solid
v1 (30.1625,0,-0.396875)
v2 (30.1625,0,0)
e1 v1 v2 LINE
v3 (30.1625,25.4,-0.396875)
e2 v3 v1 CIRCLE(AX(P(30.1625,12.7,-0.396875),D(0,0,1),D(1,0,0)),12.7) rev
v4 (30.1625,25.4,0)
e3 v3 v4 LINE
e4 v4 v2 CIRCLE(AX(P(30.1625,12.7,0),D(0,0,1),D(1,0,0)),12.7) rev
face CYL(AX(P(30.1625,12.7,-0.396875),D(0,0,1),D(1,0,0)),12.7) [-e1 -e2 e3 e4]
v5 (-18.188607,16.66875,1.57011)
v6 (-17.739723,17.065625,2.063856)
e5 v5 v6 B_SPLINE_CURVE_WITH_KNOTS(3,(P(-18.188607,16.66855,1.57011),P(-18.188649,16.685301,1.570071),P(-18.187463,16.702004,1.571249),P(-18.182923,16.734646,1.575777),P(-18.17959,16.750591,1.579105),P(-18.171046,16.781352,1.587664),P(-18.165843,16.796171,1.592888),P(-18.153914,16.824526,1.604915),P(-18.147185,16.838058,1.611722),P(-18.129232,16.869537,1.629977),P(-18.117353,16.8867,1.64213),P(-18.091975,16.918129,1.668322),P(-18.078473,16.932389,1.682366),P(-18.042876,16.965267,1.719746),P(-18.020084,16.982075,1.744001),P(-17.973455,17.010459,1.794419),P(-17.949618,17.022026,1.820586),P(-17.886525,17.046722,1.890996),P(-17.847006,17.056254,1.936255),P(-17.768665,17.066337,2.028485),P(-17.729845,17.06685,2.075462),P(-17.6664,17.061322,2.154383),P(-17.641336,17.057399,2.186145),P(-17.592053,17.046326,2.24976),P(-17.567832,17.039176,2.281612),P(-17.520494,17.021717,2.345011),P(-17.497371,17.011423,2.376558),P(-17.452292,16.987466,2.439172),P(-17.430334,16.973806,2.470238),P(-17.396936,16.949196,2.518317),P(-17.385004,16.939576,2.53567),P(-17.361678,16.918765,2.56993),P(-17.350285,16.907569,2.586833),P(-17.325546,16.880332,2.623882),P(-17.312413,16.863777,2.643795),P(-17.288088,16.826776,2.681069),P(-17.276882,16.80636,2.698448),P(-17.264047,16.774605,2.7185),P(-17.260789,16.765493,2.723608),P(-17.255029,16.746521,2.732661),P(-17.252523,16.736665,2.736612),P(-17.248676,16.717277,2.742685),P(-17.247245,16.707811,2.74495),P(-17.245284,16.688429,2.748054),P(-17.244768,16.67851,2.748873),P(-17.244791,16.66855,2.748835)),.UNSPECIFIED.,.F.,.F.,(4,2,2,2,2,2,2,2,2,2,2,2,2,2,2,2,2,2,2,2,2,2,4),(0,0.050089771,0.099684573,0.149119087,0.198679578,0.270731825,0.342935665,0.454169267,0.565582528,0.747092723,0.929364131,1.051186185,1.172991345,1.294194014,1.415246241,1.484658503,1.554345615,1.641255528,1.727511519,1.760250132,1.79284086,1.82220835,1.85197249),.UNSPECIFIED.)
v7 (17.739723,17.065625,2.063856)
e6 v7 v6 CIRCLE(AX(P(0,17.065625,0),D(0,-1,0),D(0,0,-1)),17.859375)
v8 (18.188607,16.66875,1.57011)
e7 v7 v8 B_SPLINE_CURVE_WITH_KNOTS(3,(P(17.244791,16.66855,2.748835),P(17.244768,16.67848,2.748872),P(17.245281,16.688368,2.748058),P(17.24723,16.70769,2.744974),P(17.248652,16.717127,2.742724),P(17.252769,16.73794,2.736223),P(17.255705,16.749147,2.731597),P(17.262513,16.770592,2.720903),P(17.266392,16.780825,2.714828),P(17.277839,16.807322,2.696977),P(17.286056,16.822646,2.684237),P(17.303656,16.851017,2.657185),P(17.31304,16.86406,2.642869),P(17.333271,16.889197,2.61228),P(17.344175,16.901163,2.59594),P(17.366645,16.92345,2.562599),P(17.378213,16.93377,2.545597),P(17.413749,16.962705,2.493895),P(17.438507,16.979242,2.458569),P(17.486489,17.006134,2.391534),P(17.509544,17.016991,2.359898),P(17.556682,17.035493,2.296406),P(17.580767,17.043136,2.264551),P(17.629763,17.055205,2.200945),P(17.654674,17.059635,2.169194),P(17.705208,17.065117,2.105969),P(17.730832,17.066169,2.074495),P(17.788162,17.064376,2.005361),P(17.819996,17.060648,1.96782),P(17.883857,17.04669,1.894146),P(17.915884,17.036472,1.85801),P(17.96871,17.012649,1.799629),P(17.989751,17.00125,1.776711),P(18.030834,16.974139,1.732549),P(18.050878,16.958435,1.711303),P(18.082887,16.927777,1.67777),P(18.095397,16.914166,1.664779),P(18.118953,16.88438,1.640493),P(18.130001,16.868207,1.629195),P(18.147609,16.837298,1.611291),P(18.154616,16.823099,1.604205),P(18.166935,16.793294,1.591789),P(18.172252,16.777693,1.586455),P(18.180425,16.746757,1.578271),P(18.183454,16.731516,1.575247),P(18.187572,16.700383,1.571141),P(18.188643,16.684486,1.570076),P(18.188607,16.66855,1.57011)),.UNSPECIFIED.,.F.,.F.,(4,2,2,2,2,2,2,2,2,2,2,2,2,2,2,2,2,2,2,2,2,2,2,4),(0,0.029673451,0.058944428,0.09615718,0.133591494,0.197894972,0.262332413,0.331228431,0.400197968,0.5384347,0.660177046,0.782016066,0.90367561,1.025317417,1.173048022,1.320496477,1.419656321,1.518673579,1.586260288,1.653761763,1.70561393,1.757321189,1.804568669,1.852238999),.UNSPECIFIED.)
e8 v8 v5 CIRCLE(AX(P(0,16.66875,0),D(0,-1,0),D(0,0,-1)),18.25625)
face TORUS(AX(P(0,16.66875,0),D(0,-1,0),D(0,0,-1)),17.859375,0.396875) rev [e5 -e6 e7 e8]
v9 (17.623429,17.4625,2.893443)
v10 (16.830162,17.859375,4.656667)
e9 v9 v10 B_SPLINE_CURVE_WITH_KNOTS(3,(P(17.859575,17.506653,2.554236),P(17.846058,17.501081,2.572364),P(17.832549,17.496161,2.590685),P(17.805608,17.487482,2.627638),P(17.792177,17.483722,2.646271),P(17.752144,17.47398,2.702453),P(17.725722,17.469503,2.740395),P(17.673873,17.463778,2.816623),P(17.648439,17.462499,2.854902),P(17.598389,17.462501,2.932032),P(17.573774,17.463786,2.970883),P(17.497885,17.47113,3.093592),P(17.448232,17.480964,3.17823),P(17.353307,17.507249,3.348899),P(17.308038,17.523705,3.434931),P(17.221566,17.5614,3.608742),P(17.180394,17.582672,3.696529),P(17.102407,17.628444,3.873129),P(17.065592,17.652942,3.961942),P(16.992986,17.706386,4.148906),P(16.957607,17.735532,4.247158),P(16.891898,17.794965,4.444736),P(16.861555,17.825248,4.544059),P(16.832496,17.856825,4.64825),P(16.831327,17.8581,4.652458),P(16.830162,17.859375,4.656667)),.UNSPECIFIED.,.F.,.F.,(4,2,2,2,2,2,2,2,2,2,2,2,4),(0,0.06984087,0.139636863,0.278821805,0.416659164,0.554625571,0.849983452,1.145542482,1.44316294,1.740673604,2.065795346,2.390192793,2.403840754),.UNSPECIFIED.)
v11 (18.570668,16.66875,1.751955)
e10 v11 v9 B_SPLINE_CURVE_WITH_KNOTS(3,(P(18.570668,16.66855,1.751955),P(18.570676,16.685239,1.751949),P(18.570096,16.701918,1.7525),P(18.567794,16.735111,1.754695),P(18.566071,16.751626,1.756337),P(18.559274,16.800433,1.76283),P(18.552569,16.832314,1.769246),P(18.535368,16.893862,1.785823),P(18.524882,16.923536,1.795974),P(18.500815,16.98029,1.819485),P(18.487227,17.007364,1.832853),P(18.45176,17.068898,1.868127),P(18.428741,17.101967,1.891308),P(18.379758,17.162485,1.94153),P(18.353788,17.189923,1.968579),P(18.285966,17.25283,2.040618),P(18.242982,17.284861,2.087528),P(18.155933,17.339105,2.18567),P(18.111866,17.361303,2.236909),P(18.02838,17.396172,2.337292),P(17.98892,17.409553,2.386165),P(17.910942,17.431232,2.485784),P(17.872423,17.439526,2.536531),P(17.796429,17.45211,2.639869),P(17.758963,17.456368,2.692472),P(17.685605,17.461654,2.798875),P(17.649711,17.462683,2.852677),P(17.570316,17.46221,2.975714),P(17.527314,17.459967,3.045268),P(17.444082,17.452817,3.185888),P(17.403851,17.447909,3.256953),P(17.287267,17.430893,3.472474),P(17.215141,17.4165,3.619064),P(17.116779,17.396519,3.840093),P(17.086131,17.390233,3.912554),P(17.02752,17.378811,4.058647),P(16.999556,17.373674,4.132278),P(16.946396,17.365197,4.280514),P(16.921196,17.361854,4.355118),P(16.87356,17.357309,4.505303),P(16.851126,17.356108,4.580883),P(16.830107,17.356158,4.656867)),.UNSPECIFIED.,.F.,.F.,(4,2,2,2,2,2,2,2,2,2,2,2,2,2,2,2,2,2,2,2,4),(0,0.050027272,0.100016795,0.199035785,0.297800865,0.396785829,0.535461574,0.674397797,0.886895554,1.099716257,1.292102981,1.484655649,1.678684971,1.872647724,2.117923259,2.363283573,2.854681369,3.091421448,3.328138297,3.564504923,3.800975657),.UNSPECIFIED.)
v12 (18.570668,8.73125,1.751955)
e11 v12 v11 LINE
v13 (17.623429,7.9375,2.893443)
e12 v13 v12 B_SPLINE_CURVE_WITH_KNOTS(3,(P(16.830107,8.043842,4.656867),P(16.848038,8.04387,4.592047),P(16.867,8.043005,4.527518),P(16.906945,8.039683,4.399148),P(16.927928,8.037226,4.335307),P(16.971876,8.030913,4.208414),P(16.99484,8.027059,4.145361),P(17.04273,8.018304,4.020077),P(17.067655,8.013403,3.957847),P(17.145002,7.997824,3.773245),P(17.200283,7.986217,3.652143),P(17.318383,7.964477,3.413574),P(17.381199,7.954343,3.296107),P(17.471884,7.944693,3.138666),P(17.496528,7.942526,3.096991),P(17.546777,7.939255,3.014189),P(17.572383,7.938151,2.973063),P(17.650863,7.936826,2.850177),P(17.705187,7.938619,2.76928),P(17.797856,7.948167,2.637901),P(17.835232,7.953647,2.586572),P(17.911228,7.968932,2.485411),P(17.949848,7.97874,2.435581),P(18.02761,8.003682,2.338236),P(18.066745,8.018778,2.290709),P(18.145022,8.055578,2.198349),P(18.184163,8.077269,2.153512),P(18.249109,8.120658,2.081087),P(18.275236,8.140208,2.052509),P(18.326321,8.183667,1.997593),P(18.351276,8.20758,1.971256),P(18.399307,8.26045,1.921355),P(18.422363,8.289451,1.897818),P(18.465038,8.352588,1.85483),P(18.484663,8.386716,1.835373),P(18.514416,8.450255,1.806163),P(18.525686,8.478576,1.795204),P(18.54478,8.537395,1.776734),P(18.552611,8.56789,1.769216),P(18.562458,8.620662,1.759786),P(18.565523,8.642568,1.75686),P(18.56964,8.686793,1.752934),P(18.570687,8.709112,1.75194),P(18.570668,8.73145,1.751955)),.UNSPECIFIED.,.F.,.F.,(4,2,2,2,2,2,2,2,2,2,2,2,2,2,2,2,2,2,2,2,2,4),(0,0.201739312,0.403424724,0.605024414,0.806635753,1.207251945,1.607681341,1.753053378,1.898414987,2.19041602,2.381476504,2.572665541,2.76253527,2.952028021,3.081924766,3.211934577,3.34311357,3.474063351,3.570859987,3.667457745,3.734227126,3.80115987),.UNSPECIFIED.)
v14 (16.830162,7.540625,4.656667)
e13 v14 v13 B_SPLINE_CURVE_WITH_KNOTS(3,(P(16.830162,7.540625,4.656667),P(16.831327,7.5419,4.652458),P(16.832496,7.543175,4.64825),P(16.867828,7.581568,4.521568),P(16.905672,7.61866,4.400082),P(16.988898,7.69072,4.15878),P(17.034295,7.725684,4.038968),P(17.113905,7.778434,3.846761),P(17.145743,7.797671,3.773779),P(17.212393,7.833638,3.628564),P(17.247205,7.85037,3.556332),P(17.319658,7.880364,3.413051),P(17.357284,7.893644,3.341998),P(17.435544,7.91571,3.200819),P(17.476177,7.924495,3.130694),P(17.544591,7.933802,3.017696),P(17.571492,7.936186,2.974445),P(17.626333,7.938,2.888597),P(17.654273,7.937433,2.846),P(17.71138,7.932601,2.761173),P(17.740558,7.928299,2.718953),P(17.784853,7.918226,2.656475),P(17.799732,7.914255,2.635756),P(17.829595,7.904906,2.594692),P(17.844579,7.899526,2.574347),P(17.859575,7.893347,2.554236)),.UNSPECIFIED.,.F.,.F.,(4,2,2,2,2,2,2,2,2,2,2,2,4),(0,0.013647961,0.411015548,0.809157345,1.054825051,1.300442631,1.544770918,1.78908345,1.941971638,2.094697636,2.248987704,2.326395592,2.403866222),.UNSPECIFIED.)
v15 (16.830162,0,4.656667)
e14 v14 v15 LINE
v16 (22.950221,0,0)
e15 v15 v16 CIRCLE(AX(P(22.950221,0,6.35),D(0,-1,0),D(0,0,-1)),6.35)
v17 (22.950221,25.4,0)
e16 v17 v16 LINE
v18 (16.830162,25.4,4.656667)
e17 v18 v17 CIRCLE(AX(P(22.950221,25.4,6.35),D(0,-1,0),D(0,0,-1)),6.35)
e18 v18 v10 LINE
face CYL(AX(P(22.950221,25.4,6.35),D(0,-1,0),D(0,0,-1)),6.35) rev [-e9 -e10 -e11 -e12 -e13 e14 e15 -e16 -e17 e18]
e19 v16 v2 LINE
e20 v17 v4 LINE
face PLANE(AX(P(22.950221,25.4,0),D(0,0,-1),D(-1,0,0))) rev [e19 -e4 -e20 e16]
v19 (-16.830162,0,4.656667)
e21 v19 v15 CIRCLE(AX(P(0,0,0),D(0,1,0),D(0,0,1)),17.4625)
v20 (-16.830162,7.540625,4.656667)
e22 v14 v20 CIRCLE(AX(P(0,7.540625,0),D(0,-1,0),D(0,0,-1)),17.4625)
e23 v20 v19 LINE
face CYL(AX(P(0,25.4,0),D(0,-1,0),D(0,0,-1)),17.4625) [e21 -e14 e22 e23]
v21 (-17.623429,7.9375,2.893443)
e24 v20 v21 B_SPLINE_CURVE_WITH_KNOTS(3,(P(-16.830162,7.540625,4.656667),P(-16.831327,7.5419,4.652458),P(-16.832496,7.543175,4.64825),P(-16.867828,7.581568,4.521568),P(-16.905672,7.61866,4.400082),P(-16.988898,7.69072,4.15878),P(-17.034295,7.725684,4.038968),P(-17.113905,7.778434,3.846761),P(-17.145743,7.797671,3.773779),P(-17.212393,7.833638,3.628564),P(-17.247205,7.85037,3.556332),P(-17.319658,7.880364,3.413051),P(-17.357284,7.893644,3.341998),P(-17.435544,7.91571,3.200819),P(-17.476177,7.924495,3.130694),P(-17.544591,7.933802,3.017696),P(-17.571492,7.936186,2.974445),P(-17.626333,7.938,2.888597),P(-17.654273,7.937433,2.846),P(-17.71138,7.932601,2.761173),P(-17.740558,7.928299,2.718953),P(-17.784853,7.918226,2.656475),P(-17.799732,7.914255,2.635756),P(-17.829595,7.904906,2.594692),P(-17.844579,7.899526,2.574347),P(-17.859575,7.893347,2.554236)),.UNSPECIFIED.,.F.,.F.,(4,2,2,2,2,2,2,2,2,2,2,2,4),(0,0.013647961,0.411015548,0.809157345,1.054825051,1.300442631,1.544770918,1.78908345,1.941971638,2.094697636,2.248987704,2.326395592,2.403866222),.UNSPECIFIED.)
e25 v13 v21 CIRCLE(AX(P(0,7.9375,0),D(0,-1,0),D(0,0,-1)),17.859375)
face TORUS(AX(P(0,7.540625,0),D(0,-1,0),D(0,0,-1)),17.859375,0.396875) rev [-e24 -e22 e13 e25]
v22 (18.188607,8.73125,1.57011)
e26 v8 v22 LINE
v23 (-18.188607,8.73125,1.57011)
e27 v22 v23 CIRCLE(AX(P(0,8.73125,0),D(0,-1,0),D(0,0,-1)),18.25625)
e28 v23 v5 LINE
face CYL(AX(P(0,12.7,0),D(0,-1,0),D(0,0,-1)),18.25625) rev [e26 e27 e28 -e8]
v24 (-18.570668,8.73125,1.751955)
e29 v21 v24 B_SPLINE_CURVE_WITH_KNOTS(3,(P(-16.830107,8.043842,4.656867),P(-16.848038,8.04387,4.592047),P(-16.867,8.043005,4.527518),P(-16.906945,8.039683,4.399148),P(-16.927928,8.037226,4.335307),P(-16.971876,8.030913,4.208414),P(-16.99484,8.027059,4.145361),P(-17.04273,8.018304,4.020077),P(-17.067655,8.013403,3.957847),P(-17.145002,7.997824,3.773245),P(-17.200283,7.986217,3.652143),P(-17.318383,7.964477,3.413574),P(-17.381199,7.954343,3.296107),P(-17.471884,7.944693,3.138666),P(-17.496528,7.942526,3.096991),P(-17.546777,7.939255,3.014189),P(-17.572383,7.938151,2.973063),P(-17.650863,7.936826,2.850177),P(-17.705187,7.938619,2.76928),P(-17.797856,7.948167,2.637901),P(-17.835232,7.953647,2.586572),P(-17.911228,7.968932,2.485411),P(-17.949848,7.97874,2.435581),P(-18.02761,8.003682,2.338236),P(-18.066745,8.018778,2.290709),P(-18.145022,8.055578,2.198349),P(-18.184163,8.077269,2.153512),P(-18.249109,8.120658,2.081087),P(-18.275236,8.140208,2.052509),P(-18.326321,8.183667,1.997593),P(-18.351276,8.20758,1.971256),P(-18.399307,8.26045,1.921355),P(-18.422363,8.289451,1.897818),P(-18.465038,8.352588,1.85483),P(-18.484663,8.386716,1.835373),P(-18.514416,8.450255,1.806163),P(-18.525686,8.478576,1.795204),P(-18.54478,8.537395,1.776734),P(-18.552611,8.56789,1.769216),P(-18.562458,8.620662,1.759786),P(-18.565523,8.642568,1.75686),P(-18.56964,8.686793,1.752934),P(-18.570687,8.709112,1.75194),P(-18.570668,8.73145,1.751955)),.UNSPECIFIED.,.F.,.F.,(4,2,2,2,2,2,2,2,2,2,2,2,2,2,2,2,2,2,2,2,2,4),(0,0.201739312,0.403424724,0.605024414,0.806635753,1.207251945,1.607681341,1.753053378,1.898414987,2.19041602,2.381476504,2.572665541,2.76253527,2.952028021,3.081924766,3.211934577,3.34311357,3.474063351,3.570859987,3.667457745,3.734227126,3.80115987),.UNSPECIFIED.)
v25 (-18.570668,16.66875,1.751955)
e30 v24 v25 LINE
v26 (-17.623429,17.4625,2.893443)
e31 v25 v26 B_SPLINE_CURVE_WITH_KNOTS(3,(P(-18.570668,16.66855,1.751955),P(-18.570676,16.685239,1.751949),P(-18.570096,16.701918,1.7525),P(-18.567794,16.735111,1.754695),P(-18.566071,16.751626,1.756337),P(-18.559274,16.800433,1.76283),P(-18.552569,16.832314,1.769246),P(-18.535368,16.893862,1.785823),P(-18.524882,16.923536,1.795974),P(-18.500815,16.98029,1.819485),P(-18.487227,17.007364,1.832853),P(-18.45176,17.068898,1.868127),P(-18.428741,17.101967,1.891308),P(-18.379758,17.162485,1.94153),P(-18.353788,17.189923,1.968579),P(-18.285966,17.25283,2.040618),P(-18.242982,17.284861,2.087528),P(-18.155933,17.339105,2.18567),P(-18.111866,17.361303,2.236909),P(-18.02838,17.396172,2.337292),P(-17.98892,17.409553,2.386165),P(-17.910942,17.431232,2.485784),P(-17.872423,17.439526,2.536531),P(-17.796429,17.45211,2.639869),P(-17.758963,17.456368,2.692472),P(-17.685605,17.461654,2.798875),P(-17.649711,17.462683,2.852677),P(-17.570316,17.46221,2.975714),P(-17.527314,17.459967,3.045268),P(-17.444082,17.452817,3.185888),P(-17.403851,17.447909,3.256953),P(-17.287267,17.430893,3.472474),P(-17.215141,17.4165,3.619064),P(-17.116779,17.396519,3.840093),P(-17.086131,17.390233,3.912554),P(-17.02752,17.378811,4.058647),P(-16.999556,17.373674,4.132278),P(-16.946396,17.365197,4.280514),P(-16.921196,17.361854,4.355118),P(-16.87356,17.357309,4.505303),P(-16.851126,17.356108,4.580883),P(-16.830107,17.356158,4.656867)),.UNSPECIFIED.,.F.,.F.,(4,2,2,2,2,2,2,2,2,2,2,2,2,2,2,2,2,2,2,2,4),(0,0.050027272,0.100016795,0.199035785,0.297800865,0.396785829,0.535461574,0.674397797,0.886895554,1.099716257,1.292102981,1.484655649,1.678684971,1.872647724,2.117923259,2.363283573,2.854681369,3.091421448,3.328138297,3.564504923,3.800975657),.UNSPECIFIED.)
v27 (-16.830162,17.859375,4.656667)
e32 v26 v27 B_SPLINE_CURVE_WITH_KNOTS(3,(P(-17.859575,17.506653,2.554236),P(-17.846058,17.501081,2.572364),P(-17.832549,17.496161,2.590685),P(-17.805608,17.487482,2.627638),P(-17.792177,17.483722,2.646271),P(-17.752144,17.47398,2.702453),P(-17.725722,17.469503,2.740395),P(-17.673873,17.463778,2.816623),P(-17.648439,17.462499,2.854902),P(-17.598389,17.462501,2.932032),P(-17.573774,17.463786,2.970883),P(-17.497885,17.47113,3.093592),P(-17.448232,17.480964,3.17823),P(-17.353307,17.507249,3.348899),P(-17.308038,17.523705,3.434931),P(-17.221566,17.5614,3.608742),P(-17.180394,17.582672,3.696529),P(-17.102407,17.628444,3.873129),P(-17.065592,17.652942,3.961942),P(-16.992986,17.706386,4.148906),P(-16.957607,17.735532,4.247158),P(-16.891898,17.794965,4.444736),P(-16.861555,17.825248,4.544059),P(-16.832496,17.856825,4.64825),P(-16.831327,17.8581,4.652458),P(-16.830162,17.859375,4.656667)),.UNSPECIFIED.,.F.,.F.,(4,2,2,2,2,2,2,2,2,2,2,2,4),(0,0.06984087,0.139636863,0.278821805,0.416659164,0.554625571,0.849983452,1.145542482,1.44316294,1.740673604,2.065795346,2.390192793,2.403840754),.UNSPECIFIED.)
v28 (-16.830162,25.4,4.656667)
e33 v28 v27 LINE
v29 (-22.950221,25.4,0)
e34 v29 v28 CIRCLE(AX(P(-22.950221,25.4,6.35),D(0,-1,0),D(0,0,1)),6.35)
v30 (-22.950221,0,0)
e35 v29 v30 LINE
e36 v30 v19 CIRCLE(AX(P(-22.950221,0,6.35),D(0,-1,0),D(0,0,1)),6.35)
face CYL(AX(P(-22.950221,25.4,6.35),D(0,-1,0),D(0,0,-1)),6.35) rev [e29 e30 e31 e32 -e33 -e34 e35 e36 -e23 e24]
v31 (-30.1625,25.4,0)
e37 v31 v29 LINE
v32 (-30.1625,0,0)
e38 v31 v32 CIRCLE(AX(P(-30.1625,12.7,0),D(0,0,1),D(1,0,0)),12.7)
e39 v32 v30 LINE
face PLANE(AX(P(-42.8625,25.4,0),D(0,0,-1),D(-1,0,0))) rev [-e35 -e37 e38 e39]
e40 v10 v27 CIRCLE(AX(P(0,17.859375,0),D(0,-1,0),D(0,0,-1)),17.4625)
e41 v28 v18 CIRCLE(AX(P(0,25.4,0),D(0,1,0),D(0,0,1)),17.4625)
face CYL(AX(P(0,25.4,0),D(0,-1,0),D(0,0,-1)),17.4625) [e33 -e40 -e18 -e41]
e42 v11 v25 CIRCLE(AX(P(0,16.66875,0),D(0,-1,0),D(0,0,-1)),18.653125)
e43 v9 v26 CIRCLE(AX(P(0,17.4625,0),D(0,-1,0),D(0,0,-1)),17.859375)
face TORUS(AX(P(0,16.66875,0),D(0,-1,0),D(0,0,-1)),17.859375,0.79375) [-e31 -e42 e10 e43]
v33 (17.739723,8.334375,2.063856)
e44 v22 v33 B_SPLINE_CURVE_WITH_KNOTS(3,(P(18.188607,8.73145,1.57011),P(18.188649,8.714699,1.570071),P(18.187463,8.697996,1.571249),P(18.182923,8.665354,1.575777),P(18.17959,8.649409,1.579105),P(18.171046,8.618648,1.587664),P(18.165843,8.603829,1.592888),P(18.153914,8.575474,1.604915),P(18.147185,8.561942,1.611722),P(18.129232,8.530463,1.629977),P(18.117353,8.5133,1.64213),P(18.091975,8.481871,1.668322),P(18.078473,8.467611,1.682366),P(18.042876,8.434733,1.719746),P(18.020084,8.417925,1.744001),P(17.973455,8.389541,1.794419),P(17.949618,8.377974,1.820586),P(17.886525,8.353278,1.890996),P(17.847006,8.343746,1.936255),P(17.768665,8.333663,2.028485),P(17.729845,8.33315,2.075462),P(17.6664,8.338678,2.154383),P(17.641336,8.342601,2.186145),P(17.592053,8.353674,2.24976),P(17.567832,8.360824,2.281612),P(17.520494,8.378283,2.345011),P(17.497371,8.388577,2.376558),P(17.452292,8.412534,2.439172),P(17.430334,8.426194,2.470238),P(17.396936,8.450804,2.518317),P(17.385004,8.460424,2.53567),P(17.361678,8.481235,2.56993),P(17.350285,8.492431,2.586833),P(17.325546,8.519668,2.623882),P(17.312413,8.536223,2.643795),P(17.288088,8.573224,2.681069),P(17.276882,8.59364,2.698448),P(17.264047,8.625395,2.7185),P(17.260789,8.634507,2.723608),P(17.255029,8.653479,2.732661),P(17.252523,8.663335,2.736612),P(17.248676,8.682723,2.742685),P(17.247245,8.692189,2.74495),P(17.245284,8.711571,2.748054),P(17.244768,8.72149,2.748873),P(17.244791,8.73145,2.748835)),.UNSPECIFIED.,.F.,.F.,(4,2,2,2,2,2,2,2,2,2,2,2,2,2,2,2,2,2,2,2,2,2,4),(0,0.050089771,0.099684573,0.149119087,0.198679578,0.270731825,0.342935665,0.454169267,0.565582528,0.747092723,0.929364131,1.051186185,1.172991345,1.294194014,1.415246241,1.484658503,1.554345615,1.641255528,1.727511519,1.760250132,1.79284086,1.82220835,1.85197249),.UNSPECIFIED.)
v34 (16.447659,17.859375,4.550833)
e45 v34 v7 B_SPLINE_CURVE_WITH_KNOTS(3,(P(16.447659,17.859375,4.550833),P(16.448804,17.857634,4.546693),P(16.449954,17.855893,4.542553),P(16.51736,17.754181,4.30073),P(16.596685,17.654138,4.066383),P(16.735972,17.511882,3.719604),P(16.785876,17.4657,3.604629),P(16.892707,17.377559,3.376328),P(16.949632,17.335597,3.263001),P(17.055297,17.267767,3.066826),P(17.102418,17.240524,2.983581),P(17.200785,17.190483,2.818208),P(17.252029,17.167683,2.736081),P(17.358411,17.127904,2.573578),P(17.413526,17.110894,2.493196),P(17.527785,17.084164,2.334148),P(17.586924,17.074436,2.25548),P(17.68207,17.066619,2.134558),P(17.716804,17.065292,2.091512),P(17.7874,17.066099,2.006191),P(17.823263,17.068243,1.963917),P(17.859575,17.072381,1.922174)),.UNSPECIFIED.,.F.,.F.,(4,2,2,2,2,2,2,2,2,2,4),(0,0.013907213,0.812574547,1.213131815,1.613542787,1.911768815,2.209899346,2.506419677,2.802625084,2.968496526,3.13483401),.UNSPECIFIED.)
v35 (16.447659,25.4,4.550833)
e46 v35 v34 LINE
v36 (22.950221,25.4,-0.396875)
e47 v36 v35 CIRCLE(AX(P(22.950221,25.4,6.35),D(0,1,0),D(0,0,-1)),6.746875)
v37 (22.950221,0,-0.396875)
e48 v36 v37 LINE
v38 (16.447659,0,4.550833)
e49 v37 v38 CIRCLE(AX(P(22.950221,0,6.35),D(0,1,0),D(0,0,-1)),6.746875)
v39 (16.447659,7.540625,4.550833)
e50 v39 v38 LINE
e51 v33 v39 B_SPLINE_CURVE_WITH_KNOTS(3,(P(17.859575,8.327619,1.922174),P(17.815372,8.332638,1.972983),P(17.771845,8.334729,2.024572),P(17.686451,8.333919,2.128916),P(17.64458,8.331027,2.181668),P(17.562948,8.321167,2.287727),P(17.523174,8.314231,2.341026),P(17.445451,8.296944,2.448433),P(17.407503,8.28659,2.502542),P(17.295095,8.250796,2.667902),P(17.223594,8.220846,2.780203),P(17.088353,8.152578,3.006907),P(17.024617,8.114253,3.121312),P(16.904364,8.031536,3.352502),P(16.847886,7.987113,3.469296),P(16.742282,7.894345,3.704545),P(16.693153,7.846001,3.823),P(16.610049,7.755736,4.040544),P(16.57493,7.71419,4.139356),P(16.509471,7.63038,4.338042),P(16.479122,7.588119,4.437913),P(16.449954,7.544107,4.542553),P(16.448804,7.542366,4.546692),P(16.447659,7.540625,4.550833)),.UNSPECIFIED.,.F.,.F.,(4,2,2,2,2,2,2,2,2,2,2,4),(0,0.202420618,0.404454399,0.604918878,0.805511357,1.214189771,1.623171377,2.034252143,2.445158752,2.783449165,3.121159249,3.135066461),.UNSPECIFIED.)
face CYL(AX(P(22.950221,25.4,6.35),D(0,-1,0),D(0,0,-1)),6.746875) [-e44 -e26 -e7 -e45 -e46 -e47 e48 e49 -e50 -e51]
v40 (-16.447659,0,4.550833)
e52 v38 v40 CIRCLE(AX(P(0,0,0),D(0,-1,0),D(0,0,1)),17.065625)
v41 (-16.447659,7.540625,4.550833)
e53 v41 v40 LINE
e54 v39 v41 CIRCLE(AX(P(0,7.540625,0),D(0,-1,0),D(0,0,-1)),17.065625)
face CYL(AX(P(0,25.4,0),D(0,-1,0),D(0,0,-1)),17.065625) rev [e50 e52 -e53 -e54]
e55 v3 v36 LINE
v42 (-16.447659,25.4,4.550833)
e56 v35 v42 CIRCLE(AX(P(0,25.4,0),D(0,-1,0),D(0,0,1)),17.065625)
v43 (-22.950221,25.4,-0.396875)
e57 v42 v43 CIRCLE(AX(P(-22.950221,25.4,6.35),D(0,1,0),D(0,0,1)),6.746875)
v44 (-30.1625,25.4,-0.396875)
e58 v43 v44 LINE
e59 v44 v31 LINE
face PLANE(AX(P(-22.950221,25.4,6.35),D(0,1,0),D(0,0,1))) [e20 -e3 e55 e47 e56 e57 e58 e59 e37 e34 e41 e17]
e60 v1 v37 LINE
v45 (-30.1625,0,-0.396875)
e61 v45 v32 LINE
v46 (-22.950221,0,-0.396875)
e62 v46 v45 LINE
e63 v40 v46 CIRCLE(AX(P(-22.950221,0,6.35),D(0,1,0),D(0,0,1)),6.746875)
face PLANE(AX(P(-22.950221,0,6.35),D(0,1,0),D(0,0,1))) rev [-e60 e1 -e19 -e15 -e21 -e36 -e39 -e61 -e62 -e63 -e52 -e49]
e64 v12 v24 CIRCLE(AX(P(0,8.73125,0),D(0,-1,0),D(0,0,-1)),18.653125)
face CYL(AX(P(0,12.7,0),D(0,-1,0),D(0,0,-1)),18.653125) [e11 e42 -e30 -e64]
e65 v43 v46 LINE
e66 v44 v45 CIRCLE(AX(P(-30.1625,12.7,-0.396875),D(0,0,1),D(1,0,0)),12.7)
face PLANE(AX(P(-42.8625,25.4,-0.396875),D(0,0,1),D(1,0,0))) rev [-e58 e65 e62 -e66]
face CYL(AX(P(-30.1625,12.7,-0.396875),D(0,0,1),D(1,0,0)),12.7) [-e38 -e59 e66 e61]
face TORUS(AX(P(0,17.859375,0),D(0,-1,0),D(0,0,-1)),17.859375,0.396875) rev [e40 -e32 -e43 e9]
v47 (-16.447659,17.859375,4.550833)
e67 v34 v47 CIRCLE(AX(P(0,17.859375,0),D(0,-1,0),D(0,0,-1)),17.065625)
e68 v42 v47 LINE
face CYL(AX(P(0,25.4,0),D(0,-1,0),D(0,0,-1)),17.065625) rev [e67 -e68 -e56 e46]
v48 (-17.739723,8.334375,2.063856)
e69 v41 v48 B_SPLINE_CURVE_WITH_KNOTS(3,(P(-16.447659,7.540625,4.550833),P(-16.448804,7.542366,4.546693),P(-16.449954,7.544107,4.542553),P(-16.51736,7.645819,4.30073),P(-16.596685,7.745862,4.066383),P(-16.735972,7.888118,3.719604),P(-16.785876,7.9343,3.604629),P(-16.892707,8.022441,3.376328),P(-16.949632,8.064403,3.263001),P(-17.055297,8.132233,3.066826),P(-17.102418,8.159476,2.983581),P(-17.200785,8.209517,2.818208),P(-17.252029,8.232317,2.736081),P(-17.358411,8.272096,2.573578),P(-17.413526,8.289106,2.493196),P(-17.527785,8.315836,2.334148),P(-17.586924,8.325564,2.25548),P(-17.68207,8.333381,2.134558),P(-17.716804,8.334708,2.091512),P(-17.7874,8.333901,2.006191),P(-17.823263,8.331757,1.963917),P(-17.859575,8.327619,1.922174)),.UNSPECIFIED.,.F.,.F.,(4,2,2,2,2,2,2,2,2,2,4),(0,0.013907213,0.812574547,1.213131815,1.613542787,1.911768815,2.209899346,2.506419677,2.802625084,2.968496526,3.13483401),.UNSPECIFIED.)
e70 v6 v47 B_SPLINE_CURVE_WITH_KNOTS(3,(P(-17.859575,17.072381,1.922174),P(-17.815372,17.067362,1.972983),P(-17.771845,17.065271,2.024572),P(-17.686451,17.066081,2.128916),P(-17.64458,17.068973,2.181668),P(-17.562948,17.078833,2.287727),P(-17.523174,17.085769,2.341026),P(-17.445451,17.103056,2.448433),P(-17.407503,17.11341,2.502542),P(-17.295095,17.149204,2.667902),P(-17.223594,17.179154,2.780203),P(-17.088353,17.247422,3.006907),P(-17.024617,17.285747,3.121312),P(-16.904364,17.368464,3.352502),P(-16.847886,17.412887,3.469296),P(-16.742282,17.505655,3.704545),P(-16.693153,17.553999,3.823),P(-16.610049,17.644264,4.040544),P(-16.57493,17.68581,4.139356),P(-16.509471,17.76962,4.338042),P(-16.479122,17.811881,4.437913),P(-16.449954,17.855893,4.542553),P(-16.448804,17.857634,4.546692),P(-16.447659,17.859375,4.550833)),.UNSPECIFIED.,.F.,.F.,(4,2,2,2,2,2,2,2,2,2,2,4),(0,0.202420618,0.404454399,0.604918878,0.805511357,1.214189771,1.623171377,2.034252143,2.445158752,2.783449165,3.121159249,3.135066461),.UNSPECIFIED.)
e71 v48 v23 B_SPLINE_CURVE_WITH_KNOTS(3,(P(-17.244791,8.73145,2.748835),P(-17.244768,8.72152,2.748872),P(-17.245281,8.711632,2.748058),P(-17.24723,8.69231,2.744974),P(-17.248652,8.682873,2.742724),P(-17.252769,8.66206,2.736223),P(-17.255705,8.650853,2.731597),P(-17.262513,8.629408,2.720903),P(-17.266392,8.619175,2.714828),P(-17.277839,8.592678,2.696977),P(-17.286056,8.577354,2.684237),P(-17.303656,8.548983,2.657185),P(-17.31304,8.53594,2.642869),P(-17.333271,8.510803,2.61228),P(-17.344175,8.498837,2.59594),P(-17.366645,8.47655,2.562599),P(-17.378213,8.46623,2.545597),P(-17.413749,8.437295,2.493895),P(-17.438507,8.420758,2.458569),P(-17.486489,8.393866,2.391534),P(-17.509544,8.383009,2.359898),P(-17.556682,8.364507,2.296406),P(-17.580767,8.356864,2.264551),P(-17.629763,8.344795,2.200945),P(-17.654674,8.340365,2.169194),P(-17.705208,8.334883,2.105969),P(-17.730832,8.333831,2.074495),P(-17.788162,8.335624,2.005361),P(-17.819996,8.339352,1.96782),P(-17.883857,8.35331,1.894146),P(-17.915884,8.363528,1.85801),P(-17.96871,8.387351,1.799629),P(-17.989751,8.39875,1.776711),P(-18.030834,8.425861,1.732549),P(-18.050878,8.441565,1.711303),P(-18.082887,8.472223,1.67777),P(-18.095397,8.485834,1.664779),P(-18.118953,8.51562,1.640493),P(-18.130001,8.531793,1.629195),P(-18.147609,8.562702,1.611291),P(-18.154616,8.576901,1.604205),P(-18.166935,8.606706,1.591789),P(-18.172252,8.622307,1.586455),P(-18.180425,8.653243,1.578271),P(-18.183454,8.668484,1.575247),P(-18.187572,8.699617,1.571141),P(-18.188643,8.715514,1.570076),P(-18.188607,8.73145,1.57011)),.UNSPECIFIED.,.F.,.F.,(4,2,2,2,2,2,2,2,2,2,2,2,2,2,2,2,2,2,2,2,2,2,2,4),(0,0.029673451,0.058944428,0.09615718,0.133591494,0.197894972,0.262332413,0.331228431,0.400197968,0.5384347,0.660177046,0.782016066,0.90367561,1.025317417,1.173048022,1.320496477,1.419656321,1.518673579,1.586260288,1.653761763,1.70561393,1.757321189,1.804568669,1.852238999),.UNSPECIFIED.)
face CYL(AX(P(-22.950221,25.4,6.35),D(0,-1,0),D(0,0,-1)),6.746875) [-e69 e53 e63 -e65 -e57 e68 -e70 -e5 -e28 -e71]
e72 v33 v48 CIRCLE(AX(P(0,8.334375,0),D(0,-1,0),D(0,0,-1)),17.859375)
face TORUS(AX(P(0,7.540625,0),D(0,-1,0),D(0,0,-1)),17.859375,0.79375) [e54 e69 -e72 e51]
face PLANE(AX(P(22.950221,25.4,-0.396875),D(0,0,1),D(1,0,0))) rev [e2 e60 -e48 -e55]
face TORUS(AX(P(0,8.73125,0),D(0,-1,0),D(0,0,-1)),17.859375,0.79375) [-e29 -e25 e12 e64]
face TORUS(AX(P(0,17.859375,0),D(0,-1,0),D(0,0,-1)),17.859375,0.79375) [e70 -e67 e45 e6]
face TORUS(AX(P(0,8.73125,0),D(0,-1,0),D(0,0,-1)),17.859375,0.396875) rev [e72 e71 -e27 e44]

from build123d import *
from build123d.topology import SkipClean

# Parameters (mm, degrees)
BOSS_EXTRUDE1_DEPTH     = 25.4
CUT_EXTRUDE1_DEPTH      = 53.79481804590295
CUT_EXTRUDE2_DEPTH      = 49.43989042913134
CUT_EXTRUDE2_DEPTH_BACK = 49.43989042913134


with BuildPart() as part:
    # Sketch1 → Boss-Extrude1 (new body)
    with BuildSketch(Plane(origin=(0, 0, 0), x_dir=(1, 0, 0), z_dir=(0, 1, 0))):
        with BuildLine():
            Line((-42.8625, 0), (-22.950221267996525, 0))
            ThreePointArc((-22.950221267996525, 0), (-19.105105318292708, -1.29652759646069), (-16.830162263197447, -4.656666666666666))
            ThreePointArc((-16.830162263197447, -4.656666666666666), (1.07e-15, -17.462499999999995), (16.830162263197447, -4.656666666666666))
            ThreePointArc((16.830162263197447, -4.656666666666666), (19.105105318292708, -1.296527596460689), (22.950221267996525, 0))
            Line((22.950221267996525, 0), (42.8625, 0))
            Line((42.8625, 0), (42.8625, 0.396875))
            Line((42.8625, 0.396875), (22.950221267996525, 0.39687500000000053))
            ThreePointArc((22.950221267996525, 0.39687500000000053), (18.86478557143622, -0.9806855712394844), (16.447658575397504, -4.550833333333337))
            ThreePointArc((16.447658575397504, -4.550833333333337), (-2.74e-15, -17.065625), (-16.447658575397508, -4.550833333333334))
            ThreePointArc((-16.447658575397508, -4.550833333333334), (-18.864785571436222, -0.9806855712394862), (-22.950221267996525, 0.396875))
            Line((-22.950221267996525, 0.396875), (-42.8625, 0.396875))
            Line((-42.8625, 0.396875), (-42.8625, 0))
        make_face()
    extrude(amount=BOSS_EXTRUDE1_DEPTH)

    # Sketch2 → Cut-Extrude1 (cut, through all)
    with BuildSketch(Plane.XY):
        with BuildLine():
            ThreePointArc((-42.8625, 12.7), (-39.14275612106915, 21.680256121069153), (-30.162499999999998, 25.4))
            Line((-30.162499999999998, 25.4), (-42.8625, 25.4))
            Line((-42.8625, 25.4), (-42.8625, 12.7))
        make_face()
        with BuildLine():
            ThreePointArc((-30.162499999999998, -1.78e-15), (-39.142756121069155, 3.7197438789308475), (-42.8625, 12.7))
            Line((-42.8625, 12.7), (-42.8625, 0))
            Line((-42.8625, 0), (-30.162499999999998, -1.73e-15))
        make_face()
        with BuildLine():
            ThreePointArc((30.162499999999998, 25.4), (39.14275612106915, 21.680256121069153), (42.8625, 12.700000000000001))
            Line((42.8625, 12.7), (42.8625, 25.4))
            Line((42.8625, 25.4), (30.162499999999998, 25.4))
        make_face()
        with BuildLine():
            Line((30.162499999999998, -1.73e-15), (42.8625, 0))
            Line((42.8625, 0), (42.8625, 12.7))
            ThreePointArc((42.8625, 12.700000000000001), (39.142756121069155, 3.7197438789308457), (30.16249999999999, -5.33e-15))
        make_face()
    extrude(amount=-CUT_EXTRUDE1_DEPTH, mode=Mode.SUBTRACT)

    # Sweep1: sweep along a path in Sketch6
    with SkipClean():  # the faces are left unmerged after this step: merging them gives an invalid solid
        with BuildLine(Plane(origin=(0, 12.7, 0), x_dir=(1, 0, 0), z_dir=(0, 1, 0))) as sweep1_path:
            ThreePointArc((0, -17.4625), (12.347852166, -12.347852166), (17.4625, 0))
            Line((17.4625, 0), (17.4625, 12.7))
        # Sketch5 → Sweep1 (sweep)
        with BuildSketch(Plane(origin=(0, 0, 0), x_dir=(0, 0, -1), z_dir=(1, 0, 0))):
            with BuildLine():
                Line((-17.065624999999997, 7.540624999999992), (-17.065624999999997, 5.000624999999997))
                Line((-17.065624999999997, 5.000624999999997), (-17.4625, 5.000624999999997))
                Line((-17.4625, 5.000624999999997), (-17.4625, 7.540624999999992))
                ThreePointArc((-17.4625, 7.540624999999992), (-17.578741996216586, 7.821258003783406), (-17.859375, 7.9374999999999964))
                ThreePointArc((-17.859375, 7.9374999999999964), (-18.420641007566825, 8.169983992433172), (-18.653124999999996, 8.731249999999996))
                Line((-18.653124999999996, 8.731249999999996), (-18.653125, 16.66875))
                ThreePointArc((-18.653125, 16.66875), (-18.420641007566818, 17.230016007566817), (-17.859375, 17.4625))
                ThreePointArc((-17.859375, 17.4625), (-17.57874199621659, 17.57874199621659), (-17.4625, 17.859375))
                Line((-17.4625, 17.859375), (-17.4625, 20.399375))
                Line((-17.4625, 20.399375), (-17.065624999999997, 20.399375))
                Line((-17.065624999999997, 20.399375), (-17.065624999999997, 17.859375))
                ThreePointArc((-17.065624999999997, 17.859375), (-17.298108992433175, 17.29810899243318), (-17.859374999999996, 17.065624999999997))
                ThreePointArc((-17.859374999999996, 17.065624999999997), (-18.140008003783407, 16.949383003783407), (-18.256249999999998, 16.668749999999996))
                Line((-18.256249999999998, 16.668749999999996), (-18.256249999999998, 8.731249999999996))
                ThreePointArc((-18.256249999999998, 8.731249999999996), (-18.140008003783407, 8.450616996216583), (-17.859374999999996, 8.334374999999996))
                ThreePointArc((-17.859374999999996, 8.334374999999996), (-17.298108992433175, 8.101891007566815), (-17.065624999999997, 7.540624999999992))
            make_face()
        sweep(path=sweep1_path.line)

    # Cut-Sweep1: sweep along a path in Sketch6<3>
    with BuildLine(Plane(origin=(0, 12.7, 0), x_dir=(1, 0, 0), z_dir=(0, 1, 0))) as cut_sweep1_path:
        ThreePointArc((0, -17.4625), (12.347852166, -12.347852166), (17.4625, 0))
        Line((17.4625, 0), (17.4625, 12.7))
    # Sketch10 → Cut-Sweep1 (sweep, cut)
    with BuildSketch(Plane(origin=(0, 0, 0), x_dir=(0, 0, -1), z_dir=(1, 0, 0))):
        with BuildLine():
            Line((-17.065625, 7.5406249999999915), (-17.065625, 0))
            Line((-17.065625, 0), (-10.715624999999998, 0))
            Line((-10.715624999999998, 0), (-10.715625000000001, 25.4))
            Line((-10.715625000000001, 25.4), (-17.065625000000004, 25.4))
            Line((-17.065625000000004, 25.4), (-17.065625, 17.859375))
            ThreePointArc((-17.065625, 17.859375), (-17.29810899243318, 17.298108992433175), (-17.859375000000004, 17.065625))
            ThreePointArc((-17.859375000000004, 17.065625), (-18.140008003783414, 16.94938300378341), (-18.25625, 16.66875))
            Line((-18.25625, 16.66875), (-18.25625, 8.731249999999996))
            ThreePointArc((-18.25625, 8.731249999999996), (-18.14000800378341, 8.450616996216583), (-17.859375, 8.334374999999998))
            ThreePointArc((-17.859375, 8.334374999999998), (-17.29810899243318, 8.101891007566817), (-17.065625, 7.5406249999999915))
        make_face()
    sweep(path=cut_sweep1_path.line, mode=Mode.SUBTRACT)

    # Mirror1: read off the stored shape, not the designer's step
    # Mirror1
    split(bisect_by=Plane(origin=(0, 0, 0), x_dir=(0, 0, 1), z_dir=(1, 0, 0)), keep=Keep.TOP)

    # Mirror1 2: part across plane


with BuildPart() as part_1:
    add(part.part)
    add(part.part.mirror(Plane(origin=(0, 0, 0), x_dir=(0, 0, 1), z_dir=(1, 0, 0))))

    # Sketch7 → Cut-Extrude2 (cut, two sides: drawn at the far end of the back side and taken through both)
    with BuildSketch(Plane(origin=(0, 12.7, 0), x_dir=(1, 0, 0), z_dir=(0, 1, 0)).offset(-CUT_EXTRUDE2_DEPTH_BACK)):
        with BuildLine():
            Line((-22.950221267996525, 0.39687500000000053), (-22.950221267996525, 19.446875000000002))
            Line((-22.950221267996525, 19.446875000000002), (22.950221267996525, 19.446875000000002))
            Line((22.950221267996525, 19.446875000000002), (22.950221267996525, 0.39687500000000053))
            ThreePointArc((22.950221267996525, 0.39687500000000053), (18.86478557143622, -0.9806855712394897), (16.447658575397504, -4.550833333333339))
            ThreePointArc((16.447658575397504, -4.550833333333339), (-6.53e-15, -17.065624999999997), (-16.447658575397508, -4.55083333333333))
            ThreePointArc((-16.447658575397508, -4.55083333333333), (-18.864785571436222, -0.9806855712394835), (-22.950221267996525, 0.39687500000000053))
        make_face()
    extrude(amount=CUT_EXTRUDE2_DEPTH + CUT_EXTRUDE2_DEPTH_BACK, mode=Mode.SUBTRACT)


solid = part_1.part
